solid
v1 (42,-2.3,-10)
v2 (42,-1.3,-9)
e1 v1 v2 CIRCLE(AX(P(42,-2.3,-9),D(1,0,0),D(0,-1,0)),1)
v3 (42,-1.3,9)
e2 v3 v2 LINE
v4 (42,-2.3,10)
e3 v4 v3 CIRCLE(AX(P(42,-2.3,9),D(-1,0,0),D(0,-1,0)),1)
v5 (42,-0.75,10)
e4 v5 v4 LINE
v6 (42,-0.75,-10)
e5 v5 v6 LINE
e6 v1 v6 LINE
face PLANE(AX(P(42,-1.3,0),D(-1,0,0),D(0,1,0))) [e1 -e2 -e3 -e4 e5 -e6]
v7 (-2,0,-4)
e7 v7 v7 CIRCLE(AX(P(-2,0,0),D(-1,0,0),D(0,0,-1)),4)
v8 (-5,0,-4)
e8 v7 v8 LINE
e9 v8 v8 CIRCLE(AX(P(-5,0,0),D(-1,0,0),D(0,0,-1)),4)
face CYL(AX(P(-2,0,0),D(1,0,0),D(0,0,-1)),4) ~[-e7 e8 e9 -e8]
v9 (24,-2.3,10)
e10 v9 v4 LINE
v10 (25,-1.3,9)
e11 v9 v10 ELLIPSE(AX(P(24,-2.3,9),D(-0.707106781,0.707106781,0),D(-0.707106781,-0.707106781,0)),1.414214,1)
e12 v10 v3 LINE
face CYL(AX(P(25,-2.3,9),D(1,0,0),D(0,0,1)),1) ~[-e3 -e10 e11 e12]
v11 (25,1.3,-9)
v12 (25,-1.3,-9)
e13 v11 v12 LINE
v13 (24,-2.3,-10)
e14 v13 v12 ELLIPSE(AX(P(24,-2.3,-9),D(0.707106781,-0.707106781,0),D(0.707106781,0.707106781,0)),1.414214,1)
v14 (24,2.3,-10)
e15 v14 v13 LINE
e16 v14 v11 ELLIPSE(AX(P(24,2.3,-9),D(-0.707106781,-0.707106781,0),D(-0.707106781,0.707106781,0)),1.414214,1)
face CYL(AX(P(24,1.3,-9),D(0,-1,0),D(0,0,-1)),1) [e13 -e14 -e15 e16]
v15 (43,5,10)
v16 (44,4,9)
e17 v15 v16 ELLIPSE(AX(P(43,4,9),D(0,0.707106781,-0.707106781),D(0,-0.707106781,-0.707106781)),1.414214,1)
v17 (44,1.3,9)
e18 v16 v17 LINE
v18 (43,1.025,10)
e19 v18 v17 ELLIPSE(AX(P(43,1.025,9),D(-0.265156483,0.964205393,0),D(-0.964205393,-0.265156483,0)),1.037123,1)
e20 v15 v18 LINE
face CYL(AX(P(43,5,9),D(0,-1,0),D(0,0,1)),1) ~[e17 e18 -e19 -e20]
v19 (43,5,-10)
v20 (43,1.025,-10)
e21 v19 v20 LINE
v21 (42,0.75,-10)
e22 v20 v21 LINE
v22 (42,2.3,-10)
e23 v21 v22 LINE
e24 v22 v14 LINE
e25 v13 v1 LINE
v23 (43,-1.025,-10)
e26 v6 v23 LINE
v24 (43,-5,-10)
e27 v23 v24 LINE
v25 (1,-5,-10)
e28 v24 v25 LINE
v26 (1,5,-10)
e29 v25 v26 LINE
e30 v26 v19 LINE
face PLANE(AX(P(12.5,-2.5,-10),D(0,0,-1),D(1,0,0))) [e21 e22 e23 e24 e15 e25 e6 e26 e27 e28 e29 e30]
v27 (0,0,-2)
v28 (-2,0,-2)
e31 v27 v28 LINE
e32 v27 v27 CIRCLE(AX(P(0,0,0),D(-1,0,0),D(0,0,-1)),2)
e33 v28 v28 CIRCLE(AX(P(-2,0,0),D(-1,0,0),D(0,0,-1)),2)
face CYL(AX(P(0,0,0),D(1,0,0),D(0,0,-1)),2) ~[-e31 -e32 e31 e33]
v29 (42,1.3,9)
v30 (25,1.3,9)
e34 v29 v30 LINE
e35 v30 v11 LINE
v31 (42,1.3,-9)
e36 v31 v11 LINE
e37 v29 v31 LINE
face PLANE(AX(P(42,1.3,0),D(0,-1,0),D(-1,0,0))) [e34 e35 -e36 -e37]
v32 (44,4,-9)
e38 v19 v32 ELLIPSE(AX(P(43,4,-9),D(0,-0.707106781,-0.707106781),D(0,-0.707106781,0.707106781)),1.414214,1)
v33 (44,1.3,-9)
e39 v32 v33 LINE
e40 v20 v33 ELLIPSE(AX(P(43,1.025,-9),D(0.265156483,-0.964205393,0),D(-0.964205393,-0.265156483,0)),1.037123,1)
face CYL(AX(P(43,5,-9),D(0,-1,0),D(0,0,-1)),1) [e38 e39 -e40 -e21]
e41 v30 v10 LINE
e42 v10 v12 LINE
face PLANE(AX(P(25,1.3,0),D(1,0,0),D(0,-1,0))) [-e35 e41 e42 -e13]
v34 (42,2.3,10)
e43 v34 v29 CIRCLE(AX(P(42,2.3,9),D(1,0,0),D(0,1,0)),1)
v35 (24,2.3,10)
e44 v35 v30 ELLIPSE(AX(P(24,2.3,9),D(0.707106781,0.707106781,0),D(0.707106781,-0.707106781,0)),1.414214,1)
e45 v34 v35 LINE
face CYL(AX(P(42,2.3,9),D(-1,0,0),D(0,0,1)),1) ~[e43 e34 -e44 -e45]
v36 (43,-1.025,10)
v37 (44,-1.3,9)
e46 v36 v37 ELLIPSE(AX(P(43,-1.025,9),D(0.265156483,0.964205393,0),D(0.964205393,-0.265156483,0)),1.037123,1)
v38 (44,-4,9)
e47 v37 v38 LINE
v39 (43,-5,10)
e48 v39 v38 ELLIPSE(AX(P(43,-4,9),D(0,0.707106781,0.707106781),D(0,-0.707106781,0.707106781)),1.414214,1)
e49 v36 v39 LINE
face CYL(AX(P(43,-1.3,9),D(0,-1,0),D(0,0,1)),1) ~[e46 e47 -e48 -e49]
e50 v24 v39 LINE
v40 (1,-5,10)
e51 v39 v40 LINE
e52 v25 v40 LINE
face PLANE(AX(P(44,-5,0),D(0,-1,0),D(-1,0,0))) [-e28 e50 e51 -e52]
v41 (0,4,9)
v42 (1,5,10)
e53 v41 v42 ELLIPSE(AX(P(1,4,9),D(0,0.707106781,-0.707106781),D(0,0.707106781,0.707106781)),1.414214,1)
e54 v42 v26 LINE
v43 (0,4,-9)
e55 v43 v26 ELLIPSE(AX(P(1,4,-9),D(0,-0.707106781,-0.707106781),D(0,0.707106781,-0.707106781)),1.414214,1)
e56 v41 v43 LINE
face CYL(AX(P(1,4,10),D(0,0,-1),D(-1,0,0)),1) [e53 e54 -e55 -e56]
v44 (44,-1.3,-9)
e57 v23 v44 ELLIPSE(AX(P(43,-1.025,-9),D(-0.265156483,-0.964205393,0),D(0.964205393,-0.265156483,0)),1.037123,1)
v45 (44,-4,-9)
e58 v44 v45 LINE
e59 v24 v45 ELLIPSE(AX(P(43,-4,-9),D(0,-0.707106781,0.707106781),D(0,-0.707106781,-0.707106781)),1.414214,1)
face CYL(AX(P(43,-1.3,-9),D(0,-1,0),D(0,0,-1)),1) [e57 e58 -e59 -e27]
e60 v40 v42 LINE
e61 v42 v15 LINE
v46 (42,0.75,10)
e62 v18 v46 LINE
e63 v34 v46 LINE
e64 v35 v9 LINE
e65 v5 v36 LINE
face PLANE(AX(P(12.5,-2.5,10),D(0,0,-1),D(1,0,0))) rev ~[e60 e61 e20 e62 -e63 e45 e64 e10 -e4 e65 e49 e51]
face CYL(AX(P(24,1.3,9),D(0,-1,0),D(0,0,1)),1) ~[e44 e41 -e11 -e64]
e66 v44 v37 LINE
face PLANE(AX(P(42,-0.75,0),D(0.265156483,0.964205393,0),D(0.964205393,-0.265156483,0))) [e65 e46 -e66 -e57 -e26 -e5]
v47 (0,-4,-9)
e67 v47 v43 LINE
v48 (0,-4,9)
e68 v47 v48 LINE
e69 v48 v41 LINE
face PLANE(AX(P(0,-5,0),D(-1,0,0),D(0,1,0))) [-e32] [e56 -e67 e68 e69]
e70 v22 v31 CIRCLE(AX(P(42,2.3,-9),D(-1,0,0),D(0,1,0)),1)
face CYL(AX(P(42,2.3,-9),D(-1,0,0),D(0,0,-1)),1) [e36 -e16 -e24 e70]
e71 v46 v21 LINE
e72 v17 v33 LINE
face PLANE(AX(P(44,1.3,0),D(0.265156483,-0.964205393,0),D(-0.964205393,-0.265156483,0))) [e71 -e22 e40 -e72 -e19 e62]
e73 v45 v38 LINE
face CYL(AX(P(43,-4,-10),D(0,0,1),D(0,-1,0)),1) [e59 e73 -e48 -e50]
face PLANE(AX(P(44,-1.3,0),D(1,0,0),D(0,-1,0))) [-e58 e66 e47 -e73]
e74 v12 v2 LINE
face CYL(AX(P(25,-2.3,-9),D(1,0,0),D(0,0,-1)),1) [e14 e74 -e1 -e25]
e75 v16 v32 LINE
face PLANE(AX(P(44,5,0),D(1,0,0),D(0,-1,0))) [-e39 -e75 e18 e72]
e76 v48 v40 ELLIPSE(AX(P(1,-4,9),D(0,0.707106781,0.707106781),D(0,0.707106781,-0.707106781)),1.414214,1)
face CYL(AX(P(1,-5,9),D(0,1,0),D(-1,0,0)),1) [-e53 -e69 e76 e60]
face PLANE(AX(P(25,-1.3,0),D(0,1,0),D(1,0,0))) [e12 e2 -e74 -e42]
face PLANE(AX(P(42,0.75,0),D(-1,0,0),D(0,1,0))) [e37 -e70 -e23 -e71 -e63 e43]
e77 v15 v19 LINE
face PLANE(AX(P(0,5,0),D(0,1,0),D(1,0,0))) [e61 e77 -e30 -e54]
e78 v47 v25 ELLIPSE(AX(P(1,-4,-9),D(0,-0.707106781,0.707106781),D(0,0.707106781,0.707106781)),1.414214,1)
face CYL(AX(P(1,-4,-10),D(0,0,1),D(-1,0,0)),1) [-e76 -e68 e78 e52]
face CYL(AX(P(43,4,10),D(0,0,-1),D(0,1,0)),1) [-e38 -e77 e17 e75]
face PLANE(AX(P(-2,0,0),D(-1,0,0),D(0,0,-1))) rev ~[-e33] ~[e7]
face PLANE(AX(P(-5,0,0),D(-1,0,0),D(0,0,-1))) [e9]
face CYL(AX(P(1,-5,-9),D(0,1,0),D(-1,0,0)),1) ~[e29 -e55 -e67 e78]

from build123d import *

# Parameters (mm, degrees)
F1_DEPTH = 10
F2_R     = 2
F3_DEPTH = 2
F4_R     = 4
F4_R_2   = 2
F5_DEPTH = 3
F6_R     = 1
F7_ANGLE = 90


# Not quite as in the source:
# - a feature names something its author has since deleted; it is built from what else it names


with BuildPart() as f1:
    # F0 (on Front) → F1 (new body, symmetric)
    with BuildSketch(Plane.XZ):
        Polygon((0, 5), (0, 0), (25, 0), (25, 1.3), (25, 5), align=None)
        Polygon((25, 0), (0, 0), (0, -5), (25, -5), (25, -1.3), align=None)
        Polygon((25, 5), (25, 1.3), (42, 1.3), (44, 1.3), (44, 5), align=None)
        Polygon((42, -1.3), (25, -1.3), (25, -5), (44, -5), (44, -1.3), align=None)
        Polygon((44, 1.3), (42, 1.3), (42, 0.75), align=None)
        Polygon((42, -0.75), (42, -1.3), (44, -1.3), align=None)
    extrude(amount=F1_DEPTH, both=True)

    # F2 (on face) → F3 (join)
    with BuildSketch(Plane(origin=(0, 0, 0), x_dir=(0, -1, 0), z_dir=(-1, 0, 0))):
        Circle(F2_R)
    extrude(amount=F3_DEPTH)

    # F4 (on face) → F5 (join)
    with BuildSketch(Plane(origin=(-2, 0, 0), x_dir=(0, -1, 0), z_dir=(-1, 0, 0))):
        Circle(F4_R)
        Circle(F4_R_2, mode=Mode.SUBTRACT)
        Circle(F4_R_2)
    extrude(amount=F5_DEPTH)

    # F6
    f6_edges = [f1.edges().sort_by_distance(p)[0] for p in [
        (44, -10, 3.15),
        (44, 10, 3.15),
        (44, 10, -3.15),
        (44, -10, -3.15),
        (0, -10, 0),
        (0, 10, 0),
        (0, 0, 5),
        (0, 0, -5),
        (44, 0, -5),
        (44, 0, 5),
        (33.5, -10, 1.3),
        (33.5, -10, -1.3),
        (25, -10, 0),
        (25, 10, 0),
        (33.5, 10, 1.3),
        (33.5, 10, -1.3),
    ]]
    fillet(f6_edges, radius=F6_R)


with BuildPart() as f1_1:
    # F7: moved
    add(f1.part.rotate(Axis((12.5, 0, 0), (1, 0, 0)), F7_ANGLE))


solid = f1_1.part
